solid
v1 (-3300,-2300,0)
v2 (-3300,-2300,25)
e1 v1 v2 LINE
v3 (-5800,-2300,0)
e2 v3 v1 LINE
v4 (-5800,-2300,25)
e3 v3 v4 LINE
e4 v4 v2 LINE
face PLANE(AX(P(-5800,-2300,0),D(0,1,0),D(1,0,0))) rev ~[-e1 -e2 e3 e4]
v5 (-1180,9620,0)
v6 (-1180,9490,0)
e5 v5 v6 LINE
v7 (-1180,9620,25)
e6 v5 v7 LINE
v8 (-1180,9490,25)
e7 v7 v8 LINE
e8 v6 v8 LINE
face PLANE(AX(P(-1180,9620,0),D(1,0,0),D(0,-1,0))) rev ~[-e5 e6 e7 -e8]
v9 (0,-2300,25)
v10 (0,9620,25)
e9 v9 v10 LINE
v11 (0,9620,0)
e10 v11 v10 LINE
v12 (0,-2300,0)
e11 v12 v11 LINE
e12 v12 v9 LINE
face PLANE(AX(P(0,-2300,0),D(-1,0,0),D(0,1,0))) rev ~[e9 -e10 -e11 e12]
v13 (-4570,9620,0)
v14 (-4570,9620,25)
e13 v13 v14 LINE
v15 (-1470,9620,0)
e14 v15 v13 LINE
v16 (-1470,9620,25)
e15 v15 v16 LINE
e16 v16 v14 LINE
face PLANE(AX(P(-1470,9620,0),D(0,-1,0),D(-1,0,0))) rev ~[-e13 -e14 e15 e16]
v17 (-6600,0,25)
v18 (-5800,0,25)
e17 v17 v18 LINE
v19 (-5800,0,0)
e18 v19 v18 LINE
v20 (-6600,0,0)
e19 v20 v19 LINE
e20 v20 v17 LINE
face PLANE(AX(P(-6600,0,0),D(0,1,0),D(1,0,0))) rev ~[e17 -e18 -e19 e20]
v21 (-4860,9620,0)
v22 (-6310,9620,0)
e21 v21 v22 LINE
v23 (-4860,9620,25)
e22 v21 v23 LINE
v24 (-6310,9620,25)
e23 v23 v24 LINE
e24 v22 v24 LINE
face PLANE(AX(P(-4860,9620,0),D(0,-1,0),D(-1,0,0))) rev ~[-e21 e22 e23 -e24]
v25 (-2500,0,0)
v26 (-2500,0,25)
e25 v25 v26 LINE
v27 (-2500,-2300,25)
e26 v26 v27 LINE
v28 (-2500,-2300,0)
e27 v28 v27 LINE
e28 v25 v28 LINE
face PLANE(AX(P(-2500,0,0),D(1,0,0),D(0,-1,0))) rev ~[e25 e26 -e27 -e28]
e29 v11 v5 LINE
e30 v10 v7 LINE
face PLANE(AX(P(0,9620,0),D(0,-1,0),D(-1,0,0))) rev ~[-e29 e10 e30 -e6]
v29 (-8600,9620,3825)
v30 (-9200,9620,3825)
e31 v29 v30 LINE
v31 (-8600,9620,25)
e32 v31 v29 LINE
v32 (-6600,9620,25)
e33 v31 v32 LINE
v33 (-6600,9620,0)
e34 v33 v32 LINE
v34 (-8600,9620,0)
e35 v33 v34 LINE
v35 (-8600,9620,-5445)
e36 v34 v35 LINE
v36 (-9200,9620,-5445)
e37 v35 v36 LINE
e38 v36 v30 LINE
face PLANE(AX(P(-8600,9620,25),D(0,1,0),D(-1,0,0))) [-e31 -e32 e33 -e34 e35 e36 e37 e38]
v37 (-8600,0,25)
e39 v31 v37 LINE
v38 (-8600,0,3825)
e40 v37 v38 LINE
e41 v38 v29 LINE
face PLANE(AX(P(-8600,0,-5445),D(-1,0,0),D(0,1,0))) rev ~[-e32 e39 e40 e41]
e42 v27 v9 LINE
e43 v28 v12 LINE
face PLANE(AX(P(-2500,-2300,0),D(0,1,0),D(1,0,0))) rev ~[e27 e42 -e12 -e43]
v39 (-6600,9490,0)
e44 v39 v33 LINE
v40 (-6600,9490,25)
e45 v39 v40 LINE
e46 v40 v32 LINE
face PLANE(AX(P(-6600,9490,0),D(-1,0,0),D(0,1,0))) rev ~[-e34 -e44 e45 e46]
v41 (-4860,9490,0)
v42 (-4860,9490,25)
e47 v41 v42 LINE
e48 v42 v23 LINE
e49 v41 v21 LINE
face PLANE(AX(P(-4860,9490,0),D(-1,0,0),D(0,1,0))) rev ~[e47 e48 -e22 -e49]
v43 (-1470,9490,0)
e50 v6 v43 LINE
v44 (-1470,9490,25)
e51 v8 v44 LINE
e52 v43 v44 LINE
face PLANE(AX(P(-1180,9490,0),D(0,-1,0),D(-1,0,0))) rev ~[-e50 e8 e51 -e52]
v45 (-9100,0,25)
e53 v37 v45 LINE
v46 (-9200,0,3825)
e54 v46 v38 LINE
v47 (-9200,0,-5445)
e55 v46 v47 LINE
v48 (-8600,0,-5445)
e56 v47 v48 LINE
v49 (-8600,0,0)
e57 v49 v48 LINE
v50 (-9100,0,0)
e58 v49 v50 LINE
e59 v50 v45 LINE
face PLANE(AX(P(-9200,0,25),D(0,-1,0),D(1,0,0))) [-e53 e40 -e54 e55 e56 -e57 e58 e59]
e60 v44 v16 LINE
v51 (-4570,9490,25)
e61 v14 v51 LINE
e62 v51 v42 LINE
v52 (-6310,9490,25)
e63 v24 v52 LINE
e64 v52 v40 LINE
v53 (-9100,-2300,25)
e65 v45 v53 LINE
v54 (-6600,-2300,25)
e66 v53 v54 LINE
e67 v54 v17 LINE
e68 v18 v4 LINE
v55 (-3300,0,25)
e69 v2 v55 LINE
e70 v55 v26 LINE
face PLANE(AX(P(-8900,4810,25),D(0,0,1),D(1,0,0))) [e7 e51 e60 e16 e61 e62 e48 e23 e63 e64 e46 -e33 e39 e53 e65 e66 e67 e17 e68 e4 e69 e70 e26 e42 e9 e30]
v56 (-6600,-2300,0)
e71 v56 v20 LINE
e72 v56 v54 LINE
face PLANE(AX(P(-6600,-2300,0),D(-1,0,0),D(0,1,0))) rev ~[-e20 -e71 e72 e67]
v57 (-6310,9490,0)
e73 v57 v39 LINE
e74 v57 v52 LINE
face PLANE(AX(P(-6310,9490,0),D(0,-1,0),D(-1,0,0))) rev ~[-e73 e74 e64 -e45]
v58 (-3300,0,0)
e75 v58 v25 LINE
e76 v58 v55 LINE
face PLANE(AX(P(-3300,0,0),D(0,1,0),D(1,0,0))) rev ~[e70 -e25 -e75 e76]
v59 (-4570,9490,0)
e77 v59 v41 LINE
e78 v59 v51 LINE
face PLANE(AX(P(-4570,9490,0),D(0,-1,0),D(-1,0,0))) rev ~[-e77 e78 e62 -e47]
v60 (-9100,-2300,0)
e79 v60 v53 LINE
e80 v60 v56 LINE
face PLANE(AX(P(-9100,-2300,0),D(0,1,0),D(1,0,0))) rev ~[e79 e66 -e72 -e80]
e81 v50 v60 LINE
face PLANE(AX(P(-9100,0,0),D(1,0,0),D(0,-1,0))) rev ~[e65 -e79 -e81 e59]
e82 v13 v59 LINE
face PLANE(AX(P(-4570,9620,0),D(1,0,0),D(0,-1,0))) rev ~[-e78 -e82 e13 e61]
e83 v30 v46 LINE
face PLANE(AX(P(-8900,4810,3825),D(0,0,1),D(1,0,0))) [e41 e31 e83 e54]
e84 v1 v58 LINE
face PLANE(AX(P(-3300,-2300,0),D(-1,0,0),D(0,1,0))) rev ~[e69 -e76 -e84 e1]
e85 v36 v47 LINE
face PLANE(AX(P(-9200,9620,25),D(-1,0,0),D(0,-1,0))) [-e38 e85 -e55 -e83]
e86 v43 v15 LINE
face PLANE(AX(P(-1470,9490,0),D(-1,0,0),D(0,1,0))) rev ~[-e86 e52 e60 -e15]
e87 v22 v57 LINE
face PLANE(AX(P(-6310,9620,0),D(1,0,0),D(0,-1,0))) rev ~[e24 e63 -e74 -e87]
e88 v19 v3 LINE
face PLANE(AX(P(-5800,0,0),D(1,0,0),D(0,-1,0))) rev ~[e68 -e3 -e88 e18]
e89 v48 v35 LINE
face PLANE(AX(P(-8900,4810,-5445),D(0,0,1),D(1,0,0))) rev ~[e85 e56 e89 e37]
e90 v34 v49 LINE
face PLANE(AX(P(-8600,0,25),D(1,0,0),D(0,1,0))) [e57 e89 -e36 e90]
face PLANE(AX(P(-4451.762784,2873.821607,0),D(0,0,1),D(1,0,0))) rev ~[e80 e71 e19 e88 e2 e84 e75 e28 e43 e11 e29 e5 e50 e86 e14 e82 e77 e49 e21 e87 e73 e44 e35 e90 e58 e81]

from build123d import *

# Parameters (mm, degrees)
F1_DEPTH = 25
F3_DEPTH = 5470
F4_DEPTH = 9270


# Not quite as in the source:
# - a feature names something its author has since deleted; it is built from what else it names


with BuildPart() as f1:
    # F0 (on Top) → F1 (new body)
    with BuildSketch(Plane.XY):
        Polygon((-3300, 0), (-2500, 0), (-2500, -2300), (0, -2300), (0, 0), (0, 9620), (-1180, 9620), (-1180, 9490), (-1470, 9490), (-1470, 9620), (-4570, 9620), (-4570, 9490), (-4860, 9490), (-4860, 9620), (-6310, 9620), (-6310, 9490), (-6600, 9490), (-6600, 9620), (-8600, 9620), (-8600, 0), (-9100, 0), (-9100, -2300), (-6600, -2300), (-6600, 0), (-5800, 0), (-5800, -2300), (-3300, -2300), align=None)
    extrude(amount=F1_DEPTH)



with BuildPart() as f3:
    # F2 (on face) → F3 (new body)
    with BuildSketch(Plane.XY.offset(25)):
        Polygon((-8600, 0), (-8600, 9620), (-9200, 9620), (-9200, 0), (-9100, 0), align=None)
    extrude(amount=-F3_DEPTH)


with BuildPart() as f1_1:
    add(f1.part)
    # F4 (add): a face of the model
    f4_faces = [f3.part.faces().sort_by_distance(p)[0] for p in [
        (-8900, 4810, -5445),
    ]]

    add(f3.part)  # F4 merges F3
    extrude(f4_faces, amount=-F4_DEPTH)


solid = f1_1.part
